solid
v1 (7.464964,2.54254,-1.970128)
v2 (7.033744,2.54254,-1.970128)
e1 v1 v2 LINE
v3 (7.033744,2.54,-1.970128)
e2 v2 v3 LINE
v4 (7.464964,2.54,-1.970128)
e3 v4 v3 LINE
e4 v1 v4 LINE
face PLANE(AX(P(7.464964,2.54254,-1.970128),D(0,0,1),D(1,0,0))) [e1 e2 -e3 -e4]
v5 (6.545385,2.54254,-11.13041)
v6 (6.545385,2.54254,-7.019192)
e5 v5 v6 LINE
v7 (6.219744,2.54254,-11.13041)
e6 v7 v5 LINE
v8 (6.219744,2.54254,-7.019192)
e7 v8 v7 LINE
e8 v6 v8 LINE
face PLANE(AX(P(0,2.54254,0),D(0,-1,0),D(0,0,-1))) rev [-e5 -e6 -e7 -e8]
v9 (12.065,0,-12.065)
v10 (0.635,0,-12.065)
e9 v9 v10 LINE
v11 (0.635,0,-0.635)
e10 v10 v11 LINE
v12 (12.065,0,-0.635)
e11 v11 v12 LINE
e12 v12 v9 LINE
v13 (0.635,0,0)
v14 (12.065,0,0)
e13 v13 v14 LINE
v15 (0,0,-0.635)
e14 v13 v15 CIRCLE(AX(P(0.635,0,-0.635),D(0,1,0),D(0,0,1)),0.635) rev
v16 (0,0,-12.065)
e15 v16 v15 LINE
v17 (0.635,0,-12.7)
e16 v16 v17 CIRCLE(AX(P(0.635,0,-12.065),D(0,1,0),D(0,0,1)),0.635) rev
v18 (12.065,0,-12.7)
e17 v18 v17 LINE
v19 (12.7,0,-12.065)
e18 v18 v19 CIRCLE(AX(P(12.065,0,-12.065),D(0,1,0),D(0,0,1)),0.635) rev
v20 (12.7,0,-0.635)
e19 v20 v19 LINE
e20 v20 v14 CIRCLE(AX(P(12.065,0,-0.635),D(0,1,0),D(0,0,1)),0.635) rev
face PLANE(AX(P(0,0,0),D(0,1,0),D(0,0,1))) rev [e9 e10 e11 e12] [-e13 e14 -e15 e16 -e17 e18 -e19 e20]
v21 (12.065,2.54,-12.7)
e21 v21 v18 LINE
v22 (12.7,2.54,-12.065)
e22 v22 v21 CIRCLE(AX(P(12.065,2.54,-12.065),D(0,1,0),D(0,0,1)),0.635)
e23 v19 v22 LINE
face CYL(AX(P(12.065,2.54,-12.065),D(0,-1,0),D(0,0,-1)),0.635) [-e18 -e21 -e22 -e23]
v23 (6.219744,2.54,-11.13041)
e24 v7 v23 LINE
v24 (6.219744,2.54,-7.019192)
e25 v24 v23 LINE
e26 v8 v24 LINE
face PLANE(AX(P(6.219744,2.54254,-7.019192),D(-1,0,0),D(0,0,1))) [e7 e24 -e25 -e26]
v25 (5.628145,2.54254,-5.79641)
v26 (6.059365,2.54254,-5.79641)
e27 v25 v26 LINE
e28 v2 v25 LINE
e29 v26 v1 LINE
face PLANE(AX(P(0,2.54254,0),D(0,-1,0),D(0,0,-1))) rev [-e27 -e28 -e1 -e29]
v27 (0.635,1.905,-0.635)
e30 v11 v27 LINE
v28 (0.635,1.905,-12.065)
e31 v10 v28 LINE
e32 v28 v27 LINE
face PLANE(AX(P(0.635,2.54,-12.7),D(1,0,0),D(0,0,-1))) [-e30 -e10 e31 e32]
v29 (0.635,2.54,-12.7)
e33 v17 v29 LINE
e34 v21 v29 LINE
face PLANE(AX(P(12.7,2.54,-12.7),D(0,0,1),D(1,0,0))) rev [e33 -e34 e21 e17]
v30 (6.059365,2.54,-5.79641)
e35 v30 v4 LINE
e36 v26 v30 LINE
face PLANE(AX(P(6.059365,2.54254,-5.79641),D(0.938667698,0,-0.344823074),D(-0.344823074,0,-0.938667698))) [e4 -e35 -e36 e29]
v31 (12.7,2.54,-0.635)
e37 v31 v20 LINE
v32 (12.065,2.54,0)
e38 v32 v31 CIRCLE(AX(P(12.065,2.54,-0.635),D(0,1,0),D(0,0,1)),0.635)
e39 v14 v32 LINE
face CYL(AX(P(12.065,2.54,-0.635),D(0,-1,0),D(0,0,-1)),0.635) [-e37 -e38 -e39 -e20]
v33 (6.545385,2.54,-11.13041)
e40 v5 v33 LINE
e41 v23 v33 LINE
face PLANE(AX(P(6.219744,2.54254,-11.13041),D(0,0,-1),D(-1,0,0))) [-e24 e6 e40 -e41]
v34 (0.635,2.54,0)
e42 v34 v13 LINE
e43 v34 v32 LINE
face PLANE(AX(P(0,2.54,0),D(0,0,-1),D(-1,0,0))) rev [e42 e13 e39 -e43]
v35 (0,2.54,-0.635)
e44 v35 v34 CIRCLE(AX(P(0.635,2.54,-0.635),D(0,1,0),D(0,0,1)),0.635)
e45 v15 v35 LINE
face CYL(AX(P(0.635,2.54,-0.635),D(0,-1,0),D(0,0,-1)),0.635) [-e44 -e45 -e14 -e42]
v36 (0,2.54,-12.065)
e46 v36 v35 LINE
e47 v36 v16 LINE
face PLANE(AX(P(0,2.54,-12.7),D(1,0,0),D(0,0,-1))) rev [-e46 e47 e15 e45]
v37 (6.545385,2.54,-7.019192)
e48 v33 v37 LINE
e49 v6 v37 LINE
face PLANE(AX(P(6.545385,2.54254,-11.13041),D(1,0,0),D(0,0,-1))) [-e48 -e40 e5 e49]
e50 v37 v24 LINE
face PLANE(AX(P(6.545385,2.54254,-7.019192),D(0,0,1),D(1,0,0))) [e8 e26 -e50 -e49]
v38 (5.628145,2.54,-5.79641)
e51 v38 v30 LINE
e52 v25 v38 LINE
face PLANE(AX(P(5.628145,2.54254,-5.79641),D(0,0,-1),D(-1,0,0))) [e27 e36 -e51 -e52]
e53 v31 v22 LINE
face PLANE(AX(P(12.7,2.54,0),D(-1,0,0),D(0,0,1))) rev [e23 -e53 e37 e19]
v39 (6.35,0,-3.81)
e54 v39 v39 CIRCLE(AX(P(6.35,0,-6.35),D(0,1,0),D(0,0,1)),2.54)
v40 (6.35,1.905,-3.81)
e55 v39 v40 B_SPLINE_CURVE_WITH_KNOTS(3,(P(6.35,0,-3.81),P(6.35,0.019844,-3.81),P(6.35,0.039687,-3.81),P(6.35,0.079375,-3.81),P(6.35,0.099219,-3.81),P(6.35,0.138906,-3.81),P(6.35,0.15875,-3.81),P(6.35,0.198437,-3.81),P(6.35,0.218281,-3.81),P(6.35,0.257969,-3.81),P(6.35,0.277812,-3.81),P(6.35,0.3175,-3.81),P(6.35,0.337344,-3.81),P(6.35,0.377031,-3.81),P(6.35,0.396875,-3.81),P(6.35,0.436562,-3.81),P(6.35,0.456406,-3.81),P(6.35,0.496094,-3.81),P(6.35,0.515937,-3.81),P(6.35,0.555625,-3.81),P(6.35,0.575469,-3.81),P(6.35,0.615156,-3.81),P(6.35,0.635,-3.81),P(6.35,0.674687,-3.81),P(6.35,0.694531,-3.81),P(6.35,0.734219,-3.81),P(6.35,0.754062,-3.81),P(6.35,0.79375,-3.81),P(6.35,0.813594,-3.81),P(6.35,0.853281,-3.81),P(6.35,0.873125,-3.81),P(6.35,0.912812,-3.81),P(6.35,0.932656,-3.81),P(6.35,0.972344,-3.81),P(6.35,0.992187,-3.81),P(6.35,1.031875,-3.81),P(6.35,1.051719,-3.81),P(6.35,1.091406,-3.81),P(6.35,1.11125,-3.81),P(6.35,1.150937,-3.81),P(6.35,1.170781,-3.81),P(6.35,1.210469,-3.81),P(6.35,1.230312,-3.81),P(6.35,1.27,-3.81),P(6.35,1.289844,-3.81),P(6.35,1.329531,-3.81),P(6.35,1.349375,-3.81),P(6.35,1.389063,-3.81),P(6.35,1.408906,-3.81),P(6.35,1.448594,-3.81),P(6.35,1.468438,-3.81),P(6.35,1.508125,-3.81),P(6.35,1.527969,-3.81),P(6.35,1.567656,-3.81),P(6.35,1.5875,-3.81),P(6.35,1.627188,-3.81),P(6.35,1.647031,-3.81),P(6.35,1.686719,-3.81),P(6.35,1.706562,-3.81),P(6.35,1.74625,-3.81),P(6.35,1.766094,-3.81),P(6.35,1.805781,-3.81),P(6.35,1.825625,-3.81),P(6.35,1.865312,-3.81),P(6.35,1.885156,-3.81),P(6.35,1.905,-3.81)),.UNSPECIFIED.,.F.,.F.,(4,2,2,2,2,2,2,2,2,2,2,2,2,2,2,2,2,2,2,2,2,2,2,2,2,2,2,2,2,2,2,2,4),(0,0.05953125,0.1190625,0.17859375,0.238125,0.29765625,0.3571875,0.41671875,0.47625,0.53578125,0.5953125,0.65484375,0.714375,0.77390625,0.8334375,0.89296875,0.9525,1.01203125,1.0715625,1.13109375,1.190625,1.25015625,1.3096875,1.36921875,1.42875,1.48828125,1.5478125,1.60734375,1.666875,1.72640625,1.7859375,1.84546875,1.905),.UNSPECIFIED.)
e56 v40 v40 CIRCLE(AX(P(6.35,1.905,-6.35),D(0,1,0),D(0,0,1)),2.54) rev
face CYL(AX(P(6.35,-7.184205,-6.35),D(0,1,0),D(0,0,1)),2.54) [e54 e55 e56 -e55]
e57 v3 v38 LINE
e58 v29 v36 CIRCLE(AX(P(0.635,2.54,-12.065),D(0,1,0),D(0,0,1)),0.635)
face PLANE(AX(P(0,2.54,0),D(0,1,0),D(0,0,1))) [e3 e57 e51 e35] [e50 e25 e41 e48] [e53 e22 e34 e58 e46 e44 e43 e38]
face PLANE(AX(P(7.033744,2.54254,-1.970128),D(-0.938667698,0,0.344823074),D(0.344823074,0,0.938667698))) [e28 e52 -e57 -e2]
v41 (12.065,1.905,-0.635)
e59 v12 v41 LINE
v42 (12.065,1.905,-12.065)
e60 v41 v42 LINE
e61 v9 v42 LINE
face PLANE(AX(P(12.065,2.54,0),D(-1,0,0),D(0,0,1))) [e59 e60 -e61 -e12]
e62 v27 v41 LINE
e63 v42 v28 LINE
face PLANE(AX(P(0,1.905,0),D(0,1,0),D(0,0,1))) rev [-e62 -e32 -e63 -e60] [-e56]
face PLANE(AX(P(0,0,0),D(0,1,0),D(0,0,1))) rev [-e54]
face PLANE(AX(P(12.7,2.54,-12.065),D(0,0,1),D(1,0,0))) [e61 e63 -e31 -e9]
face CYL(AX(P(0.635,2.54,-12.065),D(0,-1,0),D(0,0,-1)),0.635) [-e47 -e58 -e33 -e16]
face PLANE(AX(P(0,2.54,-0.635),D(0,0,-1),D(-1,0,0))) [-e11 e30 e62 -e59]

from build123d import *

# Parameters (mm, degrees)
SKETCH1_W           = 12.7
SKETCH1_H           = 12.7
BOSS_EXTRUDE1_DEPTH = 2.54
FILLET1_R           = 0.635
SHELL1_START        = 0.635
SHELL1_OUTLINE_W    = 1.905
SHELL1_OUTLINE_H    = 11.43
SHELL1_DEPTH        = 11.43
SKETCH2_R           = 2.54
BOSS_EXTRUDE2_DEPTH = 1.905
SKETCH4_W           = 0.325641025
SKETCH4_H           = 4.111217948
BOSS_EXTRUDE4_DEPTH = 0.00254


# Read off the part's stored shape, not the designer's step: Shell1
with BuildPart() as part:
    # Sketch1 → Boss-Extrude1 (new body)
    with BuildSketch(Plane(origin=(0, 0, 0), x_dir=(1, 0, 0), z_dir=(0, 1, 0))):
        with Locations((6.35, 6.35)):
            Rectangle(SKETCH1_W, SKETCH1_H)
    extrude(amount=BOSS_EXTRUDE1_DEPTH)

    # Fillet1
    fillet1_edges = [part.edges().sort_by_distance(p)[0] for p in [
        (0, 1.27, -12.7),
        (12.7, 1.27, -12.7),
        (12.7, 1.27, 0),
        (0, 1.27, 0),
    ]]
    fillet(fillet1_edges, radius=FILLET1_R)

    # Shell1 outline → Shell1 (cut)
    with BuildSketch(Plane.YZ.offset(SHELL1_START)):
        with Locations((0.9525, -6.35)):
            Rectangle(SHELL1_OUTLINE_W, SHELL1_OUTLINE_H)
    extrude(amount=SHELL1_DEPTH, mode=Mode.SUBTRACT)

    # Sketch2 → Boss-Extrude2 (add)
    with BuildSketch(Plane(origin=(0, 1.905, 0), x_dir=(-1, 0, 0), z_dir=(0, -1, 0))):
        with Locations(Location((-6.35, 6.35, 0), (0, 0, 270))):
            Circle(SKETCH2_R)
    extrude(amount=BOSS_EXTRUDE2_DEPTH)

    # Sketch4 → Boss-Extrude4 (add)
    with BuildSketch(Plane(origin=(0, 2.54, 0), x_dir=(1, 0, 0), z_dir=(0, 1, 0))):
        Polygon((7.464964343, 1.970128205), (7.033744391, 1.970128205), (5.628145433, 5.796410256), (6.059365385, 5.796410256), align=None)
        with Locations((6.382564102, 9.074801282)):
            Rectangle(SKETCH4_W, SKETCH4_H)
    extrude(amount=BOSS_EXTRUDE4_DEPTH)


solid = part.part
